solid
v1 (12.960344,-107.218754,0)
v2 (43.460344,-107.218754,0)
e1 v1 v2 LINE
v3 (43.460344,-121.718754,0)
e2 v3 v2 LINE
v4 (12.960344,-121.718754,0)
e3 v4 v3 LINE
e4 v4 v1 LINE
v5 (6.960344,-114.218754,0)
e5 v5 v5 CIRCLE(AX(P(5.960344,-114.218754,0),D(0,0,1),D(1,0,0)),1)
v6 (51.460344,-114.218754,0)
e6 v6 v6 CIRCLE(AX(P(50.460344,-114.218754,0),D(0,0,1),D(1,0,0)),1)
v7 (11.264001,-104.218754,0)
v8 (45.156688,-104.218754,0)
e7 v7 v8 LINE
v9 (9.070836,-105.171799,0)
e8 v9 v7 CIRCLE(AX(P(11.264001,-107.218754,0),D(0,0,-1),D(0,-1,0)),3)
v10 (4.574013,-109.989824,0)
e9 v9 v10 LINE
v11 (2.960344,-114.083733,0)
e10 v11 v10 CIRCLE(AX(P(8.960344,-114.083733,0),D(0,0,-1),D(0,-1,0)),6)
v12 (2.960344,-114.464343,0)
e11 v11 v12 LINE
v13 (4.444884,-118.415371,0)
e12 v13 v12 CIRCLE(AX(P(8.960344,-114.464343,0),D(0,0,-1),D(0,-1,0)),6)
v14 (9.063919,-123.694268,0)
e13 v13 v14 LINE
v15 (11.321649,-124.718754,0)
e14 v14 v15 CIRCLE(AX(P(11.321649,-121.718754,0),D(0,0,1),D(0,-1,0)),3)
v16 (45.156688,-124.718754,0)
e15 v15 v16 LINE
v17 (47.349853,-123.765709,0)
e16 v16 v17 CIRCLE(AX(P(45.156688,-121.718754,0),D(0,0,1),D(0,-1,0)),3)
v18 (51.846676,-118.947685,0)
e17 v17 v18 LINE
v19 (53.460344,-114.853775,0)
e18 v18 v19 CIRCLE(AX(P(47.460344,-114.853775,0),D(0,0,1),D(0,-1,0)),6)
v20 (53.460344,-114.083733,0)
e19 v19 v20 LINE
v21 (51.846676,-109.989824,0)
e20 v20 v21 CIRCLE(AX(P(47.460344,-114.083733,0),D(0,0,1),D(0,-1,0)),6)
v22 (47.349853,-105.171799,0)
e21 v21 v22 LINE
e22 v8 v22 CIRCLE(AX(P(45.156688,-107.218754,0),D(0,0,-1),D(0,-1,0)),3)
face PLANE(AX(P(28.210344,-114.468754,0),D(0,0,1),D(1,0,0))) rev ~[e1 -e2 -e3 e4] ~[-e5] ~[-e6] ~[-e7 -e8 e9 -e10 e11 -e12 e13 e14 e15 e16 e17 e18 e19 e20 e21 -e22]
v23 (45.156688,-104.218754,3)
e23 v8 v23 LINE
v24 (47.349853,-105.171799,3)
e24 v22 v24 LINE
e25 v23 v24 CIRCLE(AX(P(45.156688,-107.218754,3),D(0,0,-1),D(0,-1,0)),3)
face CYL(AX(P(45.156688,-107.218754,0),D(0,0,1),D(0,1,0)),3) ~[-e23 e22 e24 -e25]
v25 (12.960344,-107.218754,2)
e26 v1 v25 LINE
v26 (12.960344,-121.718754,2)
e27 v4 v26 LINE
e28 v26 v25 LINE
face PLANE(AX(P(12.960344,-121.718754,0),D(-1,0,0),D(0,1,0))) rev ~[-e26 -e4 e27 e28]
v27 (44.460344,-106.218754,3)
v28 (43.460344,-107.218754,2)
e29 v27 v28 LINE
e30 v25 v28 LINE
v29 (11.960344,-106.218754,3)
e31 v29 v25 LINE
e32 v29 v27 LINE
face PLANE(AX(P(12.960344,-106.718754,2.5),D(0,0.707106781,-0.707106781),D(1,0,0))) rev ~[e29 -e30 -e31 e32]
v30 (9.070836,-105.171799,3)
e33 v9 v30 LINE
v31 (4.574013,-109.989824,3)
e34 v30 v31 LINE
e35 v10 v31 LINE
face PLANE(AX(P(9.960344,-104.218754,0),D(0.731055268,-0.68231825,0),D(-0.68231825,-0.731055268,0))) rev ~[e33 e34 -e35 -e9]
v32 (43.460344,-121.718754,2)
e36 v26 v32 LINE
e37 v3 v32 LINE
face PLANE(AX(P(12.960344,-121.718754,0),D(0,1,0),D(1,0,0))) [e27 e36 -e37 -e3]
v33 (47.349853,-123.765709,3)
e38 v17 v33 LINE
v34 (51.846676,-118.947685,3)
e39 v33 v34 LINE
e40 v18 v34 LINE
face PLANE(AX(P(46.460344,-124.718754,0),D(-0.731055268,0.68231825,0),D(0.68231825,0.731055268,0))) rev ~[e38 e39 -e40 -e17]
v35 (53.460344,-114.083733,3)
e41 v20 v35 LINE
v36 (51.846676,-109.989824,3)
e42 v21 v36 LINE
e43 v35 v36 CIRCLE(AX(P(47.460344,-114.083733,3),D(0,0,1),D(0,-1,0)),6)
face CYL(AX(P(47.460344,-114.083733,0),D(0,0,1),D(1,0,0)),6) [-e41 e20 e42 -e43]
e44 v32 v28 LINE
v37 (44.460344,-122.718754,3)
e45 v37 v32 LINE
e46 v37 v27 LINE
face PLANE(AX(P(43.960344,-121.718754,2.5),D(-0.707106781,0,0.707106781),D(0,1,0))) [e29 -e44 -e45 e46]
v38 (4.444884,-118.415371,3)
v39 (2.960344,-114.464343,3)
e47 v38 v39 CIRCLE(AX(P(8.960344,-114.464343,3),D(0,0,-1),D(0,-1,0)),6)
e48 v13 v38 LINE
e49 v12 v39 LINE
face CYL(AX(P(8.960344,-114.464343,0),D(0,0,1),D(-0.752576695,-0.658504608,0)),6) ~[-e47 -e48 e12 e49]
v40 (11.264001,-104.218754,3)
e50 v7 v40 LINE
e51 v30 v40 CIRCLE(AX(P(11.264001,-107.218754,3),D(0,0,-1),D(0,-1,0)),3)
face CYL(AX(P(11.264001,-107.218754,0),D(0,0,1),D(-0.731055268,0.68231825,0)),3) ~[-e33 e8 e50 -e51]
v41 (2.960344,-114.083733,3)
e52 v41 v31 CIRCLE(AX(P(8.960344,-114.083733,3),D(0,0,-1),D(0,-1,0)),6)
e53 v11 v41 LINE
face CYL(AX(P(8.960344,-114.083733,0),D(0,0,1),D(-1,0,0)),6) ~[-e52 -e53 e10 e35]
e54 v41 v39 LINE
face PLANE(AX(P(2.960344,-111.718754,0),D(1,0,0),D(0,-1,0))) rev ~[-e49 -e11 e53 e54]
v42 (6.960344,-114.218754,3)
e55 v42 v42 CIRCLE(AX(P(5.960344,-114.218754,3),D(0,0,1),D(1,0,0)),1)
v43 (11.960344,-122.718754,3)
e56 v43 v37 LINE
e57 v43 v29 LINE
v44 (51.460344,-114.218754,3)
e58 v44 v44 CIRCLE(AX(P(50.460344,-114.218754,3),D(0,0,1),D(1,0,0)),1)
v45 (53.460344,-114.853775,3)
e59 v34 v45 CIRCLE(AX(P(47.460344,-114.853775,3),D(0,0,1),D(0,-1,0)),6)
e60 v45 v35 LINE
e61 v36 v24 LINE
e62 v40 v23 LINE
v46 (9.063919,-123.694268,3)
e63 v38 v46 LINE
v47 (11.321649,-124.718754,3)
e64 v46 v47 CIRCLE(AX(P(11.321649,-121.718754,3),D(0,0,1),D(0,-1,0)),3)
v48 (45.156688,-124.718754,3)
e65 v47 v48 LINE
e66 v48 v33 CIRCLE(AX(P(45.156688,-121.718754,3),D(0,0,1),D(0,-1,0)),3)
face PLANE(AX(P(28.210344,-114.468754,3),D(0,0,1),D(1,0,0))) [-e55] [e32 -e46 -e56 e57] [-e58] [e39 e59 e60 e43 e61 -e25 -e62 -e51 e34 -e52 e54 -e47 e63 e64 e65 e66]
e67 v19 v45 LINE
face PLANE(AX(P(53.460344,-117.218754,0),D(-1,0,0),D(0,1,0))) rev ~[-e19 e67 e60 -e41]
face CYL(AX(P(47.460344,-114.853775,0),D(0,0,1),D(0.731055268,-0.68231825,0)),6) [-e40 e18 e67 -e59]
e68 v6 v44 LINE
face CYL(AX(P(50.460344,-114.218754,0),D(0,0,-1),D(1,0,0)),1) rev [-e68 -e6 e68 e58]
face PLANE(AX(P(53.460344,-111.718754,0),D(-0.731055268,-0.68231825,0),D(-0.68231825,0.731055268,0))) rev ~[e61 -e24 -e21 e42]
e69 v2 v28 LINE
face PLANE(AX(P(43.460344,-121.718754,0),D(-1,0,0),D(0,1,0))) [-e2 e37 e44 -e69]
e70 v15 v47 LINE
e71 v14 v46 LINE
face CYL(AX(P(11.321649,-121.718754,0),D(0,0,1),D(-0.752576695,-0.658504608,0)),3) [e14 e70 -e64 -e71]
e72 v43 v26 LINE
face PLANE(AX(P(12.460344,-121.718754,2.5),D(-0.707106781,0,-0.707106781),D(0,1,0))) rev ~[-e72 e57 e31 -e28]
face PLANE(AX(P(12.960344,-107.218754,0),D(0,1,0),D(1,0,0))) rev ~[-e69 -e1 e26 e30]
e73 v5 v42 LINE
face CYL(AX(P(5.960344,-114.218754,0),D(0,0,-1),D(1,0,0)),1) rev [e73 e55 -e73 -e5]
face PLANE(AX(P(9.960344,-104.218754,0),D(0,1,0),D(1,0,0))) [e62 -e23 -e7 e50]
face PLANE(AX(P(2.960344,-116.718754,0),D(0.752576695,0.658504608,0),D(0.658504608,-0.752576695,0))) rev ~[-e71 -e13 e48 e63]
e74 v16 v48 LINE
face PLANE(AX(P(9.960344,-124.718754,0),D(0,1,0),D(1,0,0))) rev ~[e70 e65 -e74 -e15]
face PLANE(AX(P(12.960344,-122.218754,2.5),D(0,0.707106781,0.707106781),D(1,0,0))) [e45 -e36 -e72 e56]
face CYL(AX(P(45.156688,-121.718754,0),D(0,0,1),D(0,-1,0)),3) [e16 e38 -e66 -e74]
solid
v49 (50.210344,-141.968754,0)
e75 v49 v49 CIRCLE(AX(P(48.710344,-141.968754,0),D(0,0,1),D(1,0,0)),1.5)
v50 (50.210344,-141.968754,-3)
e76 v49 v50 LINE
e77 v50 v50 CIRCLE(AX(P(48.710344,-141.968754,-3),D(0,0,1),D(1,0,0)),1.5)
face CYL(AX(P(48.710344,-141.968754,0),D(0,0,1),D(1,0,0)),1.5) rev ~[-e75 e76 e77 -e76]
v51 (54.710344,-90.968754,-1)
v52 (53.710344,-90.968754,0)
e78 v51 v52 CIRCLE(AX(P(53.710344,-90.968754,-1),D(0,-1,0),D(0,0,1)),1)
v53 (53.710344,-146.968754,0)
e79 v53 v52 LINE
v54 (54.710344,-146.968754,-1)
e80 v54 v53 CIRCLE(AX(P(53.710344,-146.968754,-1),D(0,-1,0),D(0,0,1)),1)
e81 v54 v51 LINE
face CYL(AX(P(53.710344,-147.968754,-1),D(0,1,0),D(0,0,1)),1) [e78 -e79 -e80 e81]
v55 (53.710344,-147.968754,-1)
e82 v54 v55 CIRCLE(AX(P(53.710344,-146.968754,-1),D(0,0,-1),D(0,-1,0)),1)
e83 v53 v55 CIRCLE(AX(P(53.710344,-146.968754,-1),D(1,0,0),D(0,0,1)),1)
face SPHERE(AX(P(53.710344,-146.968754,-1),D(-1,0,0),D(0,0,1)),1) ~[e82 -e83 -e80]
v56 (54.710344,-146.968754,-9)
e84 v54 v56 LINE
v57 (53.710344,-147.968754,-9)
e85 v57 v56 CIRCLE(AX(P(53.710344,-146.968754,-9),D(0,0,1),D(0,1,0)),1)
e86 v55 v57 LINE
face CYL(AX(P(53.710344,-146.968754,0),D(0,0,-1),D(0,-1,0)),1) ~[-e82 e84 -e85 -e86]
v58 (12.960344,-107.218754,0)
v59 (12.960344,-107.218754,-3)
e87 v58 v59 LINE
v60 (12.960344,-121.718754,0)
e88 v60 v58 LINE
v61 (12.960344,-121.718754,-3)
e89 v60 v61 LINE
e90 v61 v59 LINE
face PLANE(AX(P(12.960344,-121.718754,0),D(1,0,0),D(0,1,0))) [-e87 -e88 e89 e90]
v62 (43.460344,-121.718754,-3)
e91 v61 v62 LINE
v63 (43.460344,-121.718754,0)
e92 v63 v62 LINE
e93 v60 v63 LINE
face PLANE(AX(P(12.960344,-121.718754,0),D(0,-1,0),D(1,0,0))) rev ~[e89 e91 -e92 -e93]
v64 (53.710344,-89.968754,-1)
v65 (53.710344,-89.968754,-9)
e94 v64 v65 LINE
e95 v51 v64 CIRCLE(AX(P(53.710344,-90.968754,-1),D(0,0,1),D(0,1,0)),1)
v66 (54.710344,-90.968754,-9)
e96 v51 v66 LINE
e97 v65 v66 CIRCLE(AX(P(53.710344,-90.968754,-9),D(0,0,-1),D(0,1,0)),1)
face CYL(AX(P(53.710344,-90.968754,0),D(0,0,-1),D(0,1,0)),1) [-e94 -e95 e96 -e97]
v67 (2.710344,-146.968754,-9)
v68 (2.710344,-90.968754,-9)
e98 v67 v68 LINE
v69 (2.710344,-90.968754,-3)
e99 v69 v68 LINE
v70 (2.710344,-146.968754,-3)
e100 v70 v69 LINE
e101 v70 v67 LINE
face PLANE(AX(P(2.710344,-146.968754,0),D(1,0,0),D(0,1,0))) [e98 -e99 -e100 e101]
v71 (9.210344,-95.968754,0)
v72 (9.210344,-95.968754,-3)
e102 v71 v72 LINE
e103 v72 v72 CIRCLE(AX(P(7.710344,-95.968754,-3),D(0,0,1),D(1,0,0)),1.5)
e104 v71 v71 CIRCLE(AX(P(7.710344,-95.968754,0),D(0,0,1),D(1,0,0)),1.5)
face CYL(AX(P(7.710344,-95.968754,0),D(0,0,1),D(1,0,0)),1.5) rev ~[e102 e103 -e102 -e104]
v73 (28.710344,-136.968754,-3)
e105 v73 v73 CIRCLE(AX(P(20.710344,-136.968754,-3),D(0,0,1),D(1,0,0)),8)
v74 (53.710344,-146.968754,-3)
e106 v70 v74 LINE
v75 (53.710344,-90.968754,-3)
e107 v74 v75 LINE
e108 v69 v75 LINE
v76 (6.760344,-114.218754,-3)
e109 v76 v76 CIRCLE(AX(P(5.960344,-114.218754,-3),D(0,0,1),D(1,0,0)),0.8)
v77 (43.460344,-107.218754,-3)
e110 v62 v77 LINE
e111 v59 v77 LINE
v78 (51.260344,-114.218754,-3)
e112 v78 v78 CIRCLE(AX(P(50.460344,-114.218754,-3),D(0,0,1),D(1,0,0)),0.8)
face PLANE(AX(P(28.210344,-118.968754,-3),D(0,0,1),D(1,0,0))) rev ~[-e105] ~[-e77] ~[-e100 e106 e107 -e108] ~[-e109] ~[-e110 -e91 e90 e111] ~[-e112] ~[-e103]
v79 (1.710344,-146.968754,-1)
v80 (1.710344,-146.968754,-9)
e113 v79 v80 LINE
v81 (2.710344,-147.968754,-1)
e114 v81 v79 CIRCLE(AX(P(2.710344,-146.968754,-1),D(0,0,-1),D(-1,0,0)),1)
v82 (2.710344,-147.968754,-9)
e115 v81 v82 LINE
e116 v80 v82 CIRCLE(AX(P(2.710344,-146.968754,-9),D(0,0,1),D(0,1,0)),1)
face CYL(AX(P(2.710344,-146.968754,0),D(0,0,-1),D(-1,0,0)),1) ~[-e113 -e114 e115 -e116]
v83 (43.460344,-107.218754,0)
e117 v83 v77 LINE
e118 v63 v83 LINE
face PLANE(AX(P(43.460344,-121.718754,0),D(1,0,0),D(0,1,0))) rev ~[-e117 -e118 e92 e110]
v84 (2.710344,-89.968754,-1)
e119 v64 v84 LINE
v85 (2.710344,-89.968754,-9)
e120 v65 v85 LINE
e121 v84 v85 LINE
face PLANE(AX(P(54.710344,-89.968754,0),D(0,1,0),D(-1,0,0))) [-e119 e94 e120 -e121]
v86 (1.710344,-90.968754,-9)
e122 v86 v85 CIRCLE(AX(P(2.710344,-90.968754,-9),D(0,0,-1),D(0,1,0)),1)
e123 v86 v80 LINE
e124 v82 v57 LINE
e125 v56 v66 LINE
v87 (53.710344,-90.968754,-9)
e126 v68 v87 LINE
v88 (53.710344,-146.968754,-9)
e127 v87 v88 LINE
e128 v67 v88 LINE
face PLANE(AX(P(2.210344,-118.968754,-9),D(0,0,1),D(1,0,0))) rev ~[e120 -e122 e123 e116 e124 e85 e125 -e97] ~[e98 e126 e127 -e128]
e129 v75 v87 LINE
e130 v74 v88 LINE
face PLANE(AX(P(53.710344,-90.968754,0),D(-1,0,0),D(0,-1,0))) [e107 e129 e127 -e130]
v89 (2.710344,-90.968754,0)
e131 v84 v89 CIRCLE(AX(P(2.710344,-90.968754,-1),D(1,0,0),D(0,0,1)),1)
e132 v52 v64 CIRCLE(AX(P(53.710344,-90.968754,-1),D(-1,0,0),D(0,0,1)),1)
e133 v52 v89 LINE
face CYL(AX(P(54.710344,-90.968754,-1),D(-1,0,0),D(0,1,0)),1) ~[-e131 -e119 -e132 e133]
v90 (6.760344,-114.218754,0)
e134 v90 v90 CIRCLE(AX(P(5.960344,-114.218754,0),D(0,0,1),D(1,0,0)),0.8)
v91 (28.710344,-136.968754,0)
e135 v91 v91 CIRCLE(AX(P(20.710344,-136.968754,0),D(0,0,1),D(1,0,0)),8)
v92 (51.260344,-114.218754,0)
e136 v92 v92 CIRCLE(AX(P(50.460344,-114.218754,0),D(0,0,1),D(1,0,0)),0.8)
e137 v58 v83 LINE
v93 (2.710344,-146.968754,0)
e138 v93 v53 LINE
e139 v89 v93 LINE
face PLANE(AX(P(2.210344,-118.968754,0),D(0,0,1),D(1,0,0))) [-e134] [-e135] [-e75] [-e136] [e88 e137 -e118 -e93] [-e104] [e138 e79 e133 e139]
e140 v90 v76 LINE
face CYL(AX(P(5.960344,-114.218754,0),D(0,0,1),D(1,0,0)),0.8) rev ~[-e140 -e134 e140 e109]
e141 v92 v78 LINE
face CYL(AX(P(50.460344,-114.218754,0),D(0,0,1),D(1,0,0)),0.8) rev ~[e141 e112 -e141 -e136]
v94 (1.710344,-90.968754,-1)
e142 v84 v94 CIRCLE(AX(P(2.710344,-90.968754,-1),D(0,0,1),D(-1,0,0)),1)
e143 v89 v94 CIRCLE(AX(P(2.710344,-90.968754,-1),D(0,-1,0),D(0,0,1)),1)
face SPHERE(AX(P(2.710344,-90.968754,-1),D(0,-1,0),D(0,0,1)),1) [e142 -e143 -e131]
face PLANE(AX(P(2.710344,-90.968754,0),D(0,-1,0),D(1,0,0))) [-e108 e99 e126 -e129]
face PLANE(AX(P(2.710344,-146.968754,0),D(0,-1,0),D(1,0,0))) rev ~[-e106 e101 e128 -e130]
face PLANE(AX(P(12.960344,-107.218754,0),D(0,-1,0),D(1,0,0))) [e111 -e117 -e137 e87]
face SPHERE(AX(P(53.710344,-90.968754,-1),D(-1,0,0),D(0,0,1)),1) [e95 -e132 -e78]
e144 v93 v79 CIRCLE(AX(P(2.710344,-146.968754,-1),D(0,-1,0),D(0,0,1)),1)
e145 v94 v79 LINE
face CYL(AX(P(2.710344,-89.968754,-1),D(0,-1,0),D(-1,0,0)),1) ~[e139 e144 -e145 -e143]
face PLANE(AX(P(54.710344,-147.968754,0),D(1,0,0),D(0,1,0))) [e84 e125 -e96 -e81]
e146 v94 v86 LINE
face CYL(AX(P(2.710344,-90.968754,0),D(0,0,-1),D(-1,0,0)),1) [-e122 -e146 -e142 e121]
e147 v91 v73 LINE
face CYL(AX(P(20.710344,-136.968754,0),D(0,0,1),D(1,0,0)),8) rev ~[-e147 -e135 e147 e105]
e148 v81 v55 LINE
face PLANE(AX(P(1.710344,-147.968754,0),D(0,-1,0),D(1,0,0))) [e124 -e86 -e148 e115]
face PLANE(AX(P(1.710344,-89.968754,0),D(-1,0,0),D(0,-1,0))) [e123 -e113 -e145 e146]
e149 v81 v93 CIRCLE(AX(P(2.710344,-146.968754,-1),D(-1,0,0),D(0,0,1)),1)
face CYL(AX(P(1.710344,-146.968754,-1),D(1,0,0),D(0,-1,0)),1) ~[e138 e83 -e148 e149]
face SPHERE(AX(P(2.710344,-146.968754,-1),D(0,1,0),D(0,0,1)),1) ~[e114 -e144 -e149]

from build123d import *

# Parameters (mm, degrees)
F0_W      = 51
F0_H      = 56
F0_R      = 6.1
F0_R_2    = 1.5
F0_W_2    = 5
F0_H_2    = 14.5
F1_DEPTH  = 1
F2_W      = 30
F2_H      = 14
F5_DEPTH  = 4
F2_W_2    = 51
F2_H_2    = 56
F2_R      = 8
F2_R_2    = 1.5
F2_R_3    = 0.8
F2_W_3    = 30.5
F2_H_3    = 14.5
F6_DEPTH  = 3
F2_W_4    = 5
F2_H_4    = 2
F2_H_5    = 5
F7_DEPTH  = 2
F3_W      = 27.8
F3_H      = 11.8
F8_DEPTH  = 1.5
F2_H_6    = 1
F9_DEPTH  = 9
F10_W     = 36.5
F10_H     = 20.5
F10_W_2   = 30.5
F10_H_2   = 14.5
F10_R     = 1
F11_DEPTH = 3
F12_R     = 6
F13_R     = 3
F14_R     = 1
F15_SIZE  = 1
F18_DEPTH = 1
F19_D     = 1.4
F19_DEPTH = 1.001
F21_D     = 1.4
F16_W     = 51
F16_H     = 56
F16_W_2   = 25
F16_H_2   = 18
F16_R     = 1.5
F22_DEPTH = 5
F23_W     = 0.2
F23_H     = 55.6
F24_DEPTH = 25
F25_D     = 1.6
F25_DEPTH = 5.001
F26_D     = 1.6


# Not quite as in the source:
# - a feature names something its author has since deleted; it is built from what else it names


with BuildPart() as f1:
    # F0 (on Top) → F1 (new body)
    with BuildSketch(Plane.XY):
        Rectangle(F0_W, F0_H)
        with Locations((-7.5, -18)):
            Circle(F0_R, mode=Mode.SUBTRACT)
        with Locations((20.5, -23)):
            Circle(F0_R_2, mode=Mode.SUBTRACT)
        with Locations((-20.5, 23)):
            Circle(F0_R_2, mode=Mode.SUBTRACT)
        Polygon((-15.25, -2.75), (-15.25, 11.75), (-2.5, 11.75), (2.5, 11.75), (15.25, 11.75), (15.25, -2.75), (2.5, -2.75), (-2.5, -2.75), align=None, mode=Mode.SUBTRACT)
        with Locations((0, 4.5)):
            Rectangle(F0_W_2, F0_H_2)
    extrude(amount=F1_DEPTH)

    # F18 (add): a face of the model
    f18_faces = [f1.faces().sort_by_distance(p)[0] for p in [
        (0.3722548806, 0.1869472989, 1),
    ]]
    extrude(f18_faces, amount=F18_DEPTH)

    # F19 (through all, one way)
    with BuildSketch(Plane.XY.offset(1)):
        with Locations((-22.25, 4.75), (22.25, 4.75)):
            Circle(F19_D / 2)
    extrude(amount=-F19_DEPTH, mode=Mode.SUBTRACT)

    # F21 (through all)
    with Locations(Plane(origin=(0, 0, 1), x_dir=(1, 0, 0), z_dir=(0, 0, -1))):
        with Locations((-22.25, -4.75), (22.25, -4.75)):
            Hole(F21_D / 2)

    # F16 (on face) → F22 (join)
    with BuildSketch(Plane.XY.offset(1)):
        Rectangle(F16_W, F16_H)
        with Locations((-7.5, -18)):
            Rectangle(F16_W_2, F16_H_2, mode=Mode.SUBTRACT)
        with Locations((20.5, -23)):
            Circle(F16_R, mode=Mode.SUBTRACT)
        with Locations((-20.5, 23)):
            Circle(F16_R, mode=Mode.SUBTRACT)
        Polygon((-15.25, -2.75), (-15.25, 11.75), (-2.5, 11.75), (2.5, 11.75), (15.25, 11.75), (15.25, -2.75), (2.5, -2.75), (-2.5, -2.75), align=None, mode=Mode.SUBTRACT)
    extrude(amount=F22_DEPTH)

    # F23 (on face) → F24 (cut)
    with BuildSketch(Plane(origin=(0, 0, 0), x_dir=(1, 0, 0), z_dir=(0, 0, -1))):
        Polygon((25.5, 28), (-25.5, 28), (-25.5, 27.8), (-25.3, 27.8), (25.3, 27.8), (25.5, 27.8), align=None)
        with Locations((-25.4, 0)):
            Rectangle(F23_W, F23_H)
        with Locations((25.4, 0)):
            Rectangle(F23_W, F23_H)
        Polygon((-25.3, -27.8), (-25.5, -27.8), (-25.5, -28), (25.5, -28), (25.5, -27.8), (25.3, -27.8), align=None)
    extrude(amount=-F24_DEPTH, mode=Mode.SUBTRACT)

    # F25 (through all, one way)
    with BuildSketch(Plane(origin=(0, 0, 1), x_dir=(1, 0, 0), z_dir=(0, 0, -1))):
        with Locations((-22.25, -4.75), (22.25, -4.75)):
            Circle(F25_D / 2)
    extrude(amount=-F25_DEPTH, mode=Mode.SUBTRACT)

    # F26 (through all)
    with Locations(Plane.XY.offset(1)):
        with Locations((22.25, 4.75), (-22.25, 4.75)):
            Hole(F26_D / 2)


with BuildPart() as f5:
    # F2 (on Top) → F5 (new body)
    with BuildSketch(Plane.XY):
        with Locations((-48.0005137329, -108.0776734079)):
            Rectangle(F2_W, F2_H)
        Polygon((-62.0005137329, -114.0776734079), (-62.0005137329, -102.0776734079), (-50.5005137329, -102.0776734079), (-45.5005137329, -102.0776734079), (-34.0005137329, -102.0776734079), (-34.0005137329, -107.0776734079), (-34.0005137329, -109.0776734079), (-34.0005137329, -114.0776734079), (-45.5005137329, -114.0776734079), (-50.5005137329, -114.0776734079), align=None, mode=Mode.SUBTRACT)
    extrude(amount=F5_DEPTH)

    # F2 (on Top) → F7 (join)
    with BuildSketch(Plane.XY):
        with Locations((-48.0005137329, -108.0776734079)):
            Rectangle(F2_W_4, F2_H_4)
        with Locations((-48.0005137329, -104.5776734079)):
            Rectangle(F2_W_4, F2_H_5)
        with Locations((-48.0005137329, -111.5776734079)):
            Rectangle(F2_W_4, F2_H_5)
    extrude(amount=F7_DEPTH)


with BuildPart() as f6:
    # F2 (on Top) → F6 (new body)
    with BuildSketch(Plane.XY):
        with Locations((28.2103444552, -118.9687541723)):
            Rectangle(F2_W_2, F2_H_2)
        with Locations((20.7103444552, -136.9687541723)):
            Circle(F2_R, mode=Mode.SUBTRACT)
        with Locations((48.7103444552, -141.9687541723)):
            Circle(F2_R_2, mode=Mode.SUBTRACT)
        with Locations((5.9603444552, -114.2187541723)):
            Circle(F2_R_3, mode=Mode.SUBTRACT)
        with Locations((28.2103444552, -114.4687541723)):
            Rectangle(F2_W_3, F2_H_3, mode=Mode.SUBTRACT)
        with Locations((50.4603444552, -114.2187541723)):
            Circle(F2_R_3, mode=Mode.SUBTRACT)
        with Locations((7.7103444552, -95.9687541723)):
            Circle(F2_R_2, mode=Mode.SUBTRACT)
    extrude(amount=-F6_DEPTH)

    # F2 (on Top) → F9 (join)
    with BuildSketch(Plane.XY):
        Polygon((2.7103444552, -146.9687541723), (2.7103444552, -90.9687541723), (2.7103444552, -89.9687541723), (1.7103444552, -89.9687541723), (1.7103444552, -147.9687541723), (2.7103444552, -147.9687541723), align=None)
        with Locations((28.2103444552, -90.4687541723)):
            Rectangle(F2_W_2, F2_H_6)
        with Locations((28.2103444552, -147.4687541723)):
            Rectangle(F2_W_2, F2_H_6)
        Polygon((53.7103444552, -89.9687541723), (53.7103444552, -90.9687541723), (53.7103444552, -146.9687541723), (53.7103444552, -147.9687541723), (54.7103444552, -147.9687541723), (54.7103444552, -89.9687541723), align=None)
    extrude(amount=-F9_DEPTH)

    # F14
    f14_edges = [f6.edges().sort_by_distance(p)[0] for p in [
        (1.710344, -118.968754, 0),
        (28.210344, -89.968754, 0),
        (28.210344, -147.968754, 0),
        (54.710344, -118.968754, 0),
        (54.710344, -147.968754, -4.5),
        (1.710344, -147.968754, -4.5),
        (1.710344, -89.968754, -4.5),
        (54.710344, -89.968754, -4.5),
    ]]
    fillet(f14_edges, radius=F14_R)


with BuildPart() as f8:
    # F3 (on Top) → F8 (new body)
    with BuildSketch(Plane.XY):
        with Locations((-52.0366017878, -79.3675661445)):
            Rectangle(F3_W, F3_H)
    extrude(amount=F8_DEPTH)


with BuildPart() as f11:
    # F10 (on face) → F11 (new body)
    with BuildSketch(Plane.XY):
        with Locations((28.2103444552, -114.4687541723)):
            Rectangle(F10_W, F10_H)
        with Locations((28.2103444552, -114.4687541723)):
            Rectangle(F10_W_2, F10_H_2, mode=Mode.SUBTRACT)
        Polygon((9.9603444552, -124.7187541723), (9.9603444552, -104.2187541723), (2.9603444552, -111.7187541723), (2.9603444552, -116.7187541723), align=None)
        with Locations((5.9603444552, -114.2187541723)):
            Circle(F10_R, mode=Mode.SUBTRACT)
        Polygon((53.4603444552, -111.7187541723), (46.4603444552, -104.2187541723), (46.4603444552, -124.7187541723), (53.4603444552, -117.2187541723), align=None)
        with Locations((50.4603444552, -114.2187541723)):
            Circle(F10_R, mode=Mode.SUBTRACT)
    extrude(amount=F11_DEPTH)

    # F12
    f12_edges = [f11.edges().sort_by_distance(p)[0] for p in [
        (2.960344, -111.718754, 1.5),
        (2.960344, -116.718754, 1.5),
        (53.460344, -117.218754, 1.5),
        (53.460344, -111.718754, 1.5),
    ]]
    fillet(f12_edges, radius=F12_R)

    # F13
    f13_edges = [f11.edges().sort_by_distance(p)[0] for p in [
        (9.960344, -104.218754, 1.5),
        (9.960344, -124.718754, 1.5),
        (46.460344, -124.718754, 1.5),
        (46.460344, -104.218754, 1.5),
    ]]
    fillet(f13_edges, radius=F13_R)

    # F15
    f15_edges = [f11.edges().sort_by_distance(p)[0] for p in [
        (12.960344, -114.468754, 3),
        (28.210344, -107.218754, 3),
        (43.460344, -114.468754, 3),
        (28.210344, -121.718754, 3),
    ]]
    chamfer(f15_edges, length=F15_SIZE)


solid = Compound([f6.part, f11.part])
